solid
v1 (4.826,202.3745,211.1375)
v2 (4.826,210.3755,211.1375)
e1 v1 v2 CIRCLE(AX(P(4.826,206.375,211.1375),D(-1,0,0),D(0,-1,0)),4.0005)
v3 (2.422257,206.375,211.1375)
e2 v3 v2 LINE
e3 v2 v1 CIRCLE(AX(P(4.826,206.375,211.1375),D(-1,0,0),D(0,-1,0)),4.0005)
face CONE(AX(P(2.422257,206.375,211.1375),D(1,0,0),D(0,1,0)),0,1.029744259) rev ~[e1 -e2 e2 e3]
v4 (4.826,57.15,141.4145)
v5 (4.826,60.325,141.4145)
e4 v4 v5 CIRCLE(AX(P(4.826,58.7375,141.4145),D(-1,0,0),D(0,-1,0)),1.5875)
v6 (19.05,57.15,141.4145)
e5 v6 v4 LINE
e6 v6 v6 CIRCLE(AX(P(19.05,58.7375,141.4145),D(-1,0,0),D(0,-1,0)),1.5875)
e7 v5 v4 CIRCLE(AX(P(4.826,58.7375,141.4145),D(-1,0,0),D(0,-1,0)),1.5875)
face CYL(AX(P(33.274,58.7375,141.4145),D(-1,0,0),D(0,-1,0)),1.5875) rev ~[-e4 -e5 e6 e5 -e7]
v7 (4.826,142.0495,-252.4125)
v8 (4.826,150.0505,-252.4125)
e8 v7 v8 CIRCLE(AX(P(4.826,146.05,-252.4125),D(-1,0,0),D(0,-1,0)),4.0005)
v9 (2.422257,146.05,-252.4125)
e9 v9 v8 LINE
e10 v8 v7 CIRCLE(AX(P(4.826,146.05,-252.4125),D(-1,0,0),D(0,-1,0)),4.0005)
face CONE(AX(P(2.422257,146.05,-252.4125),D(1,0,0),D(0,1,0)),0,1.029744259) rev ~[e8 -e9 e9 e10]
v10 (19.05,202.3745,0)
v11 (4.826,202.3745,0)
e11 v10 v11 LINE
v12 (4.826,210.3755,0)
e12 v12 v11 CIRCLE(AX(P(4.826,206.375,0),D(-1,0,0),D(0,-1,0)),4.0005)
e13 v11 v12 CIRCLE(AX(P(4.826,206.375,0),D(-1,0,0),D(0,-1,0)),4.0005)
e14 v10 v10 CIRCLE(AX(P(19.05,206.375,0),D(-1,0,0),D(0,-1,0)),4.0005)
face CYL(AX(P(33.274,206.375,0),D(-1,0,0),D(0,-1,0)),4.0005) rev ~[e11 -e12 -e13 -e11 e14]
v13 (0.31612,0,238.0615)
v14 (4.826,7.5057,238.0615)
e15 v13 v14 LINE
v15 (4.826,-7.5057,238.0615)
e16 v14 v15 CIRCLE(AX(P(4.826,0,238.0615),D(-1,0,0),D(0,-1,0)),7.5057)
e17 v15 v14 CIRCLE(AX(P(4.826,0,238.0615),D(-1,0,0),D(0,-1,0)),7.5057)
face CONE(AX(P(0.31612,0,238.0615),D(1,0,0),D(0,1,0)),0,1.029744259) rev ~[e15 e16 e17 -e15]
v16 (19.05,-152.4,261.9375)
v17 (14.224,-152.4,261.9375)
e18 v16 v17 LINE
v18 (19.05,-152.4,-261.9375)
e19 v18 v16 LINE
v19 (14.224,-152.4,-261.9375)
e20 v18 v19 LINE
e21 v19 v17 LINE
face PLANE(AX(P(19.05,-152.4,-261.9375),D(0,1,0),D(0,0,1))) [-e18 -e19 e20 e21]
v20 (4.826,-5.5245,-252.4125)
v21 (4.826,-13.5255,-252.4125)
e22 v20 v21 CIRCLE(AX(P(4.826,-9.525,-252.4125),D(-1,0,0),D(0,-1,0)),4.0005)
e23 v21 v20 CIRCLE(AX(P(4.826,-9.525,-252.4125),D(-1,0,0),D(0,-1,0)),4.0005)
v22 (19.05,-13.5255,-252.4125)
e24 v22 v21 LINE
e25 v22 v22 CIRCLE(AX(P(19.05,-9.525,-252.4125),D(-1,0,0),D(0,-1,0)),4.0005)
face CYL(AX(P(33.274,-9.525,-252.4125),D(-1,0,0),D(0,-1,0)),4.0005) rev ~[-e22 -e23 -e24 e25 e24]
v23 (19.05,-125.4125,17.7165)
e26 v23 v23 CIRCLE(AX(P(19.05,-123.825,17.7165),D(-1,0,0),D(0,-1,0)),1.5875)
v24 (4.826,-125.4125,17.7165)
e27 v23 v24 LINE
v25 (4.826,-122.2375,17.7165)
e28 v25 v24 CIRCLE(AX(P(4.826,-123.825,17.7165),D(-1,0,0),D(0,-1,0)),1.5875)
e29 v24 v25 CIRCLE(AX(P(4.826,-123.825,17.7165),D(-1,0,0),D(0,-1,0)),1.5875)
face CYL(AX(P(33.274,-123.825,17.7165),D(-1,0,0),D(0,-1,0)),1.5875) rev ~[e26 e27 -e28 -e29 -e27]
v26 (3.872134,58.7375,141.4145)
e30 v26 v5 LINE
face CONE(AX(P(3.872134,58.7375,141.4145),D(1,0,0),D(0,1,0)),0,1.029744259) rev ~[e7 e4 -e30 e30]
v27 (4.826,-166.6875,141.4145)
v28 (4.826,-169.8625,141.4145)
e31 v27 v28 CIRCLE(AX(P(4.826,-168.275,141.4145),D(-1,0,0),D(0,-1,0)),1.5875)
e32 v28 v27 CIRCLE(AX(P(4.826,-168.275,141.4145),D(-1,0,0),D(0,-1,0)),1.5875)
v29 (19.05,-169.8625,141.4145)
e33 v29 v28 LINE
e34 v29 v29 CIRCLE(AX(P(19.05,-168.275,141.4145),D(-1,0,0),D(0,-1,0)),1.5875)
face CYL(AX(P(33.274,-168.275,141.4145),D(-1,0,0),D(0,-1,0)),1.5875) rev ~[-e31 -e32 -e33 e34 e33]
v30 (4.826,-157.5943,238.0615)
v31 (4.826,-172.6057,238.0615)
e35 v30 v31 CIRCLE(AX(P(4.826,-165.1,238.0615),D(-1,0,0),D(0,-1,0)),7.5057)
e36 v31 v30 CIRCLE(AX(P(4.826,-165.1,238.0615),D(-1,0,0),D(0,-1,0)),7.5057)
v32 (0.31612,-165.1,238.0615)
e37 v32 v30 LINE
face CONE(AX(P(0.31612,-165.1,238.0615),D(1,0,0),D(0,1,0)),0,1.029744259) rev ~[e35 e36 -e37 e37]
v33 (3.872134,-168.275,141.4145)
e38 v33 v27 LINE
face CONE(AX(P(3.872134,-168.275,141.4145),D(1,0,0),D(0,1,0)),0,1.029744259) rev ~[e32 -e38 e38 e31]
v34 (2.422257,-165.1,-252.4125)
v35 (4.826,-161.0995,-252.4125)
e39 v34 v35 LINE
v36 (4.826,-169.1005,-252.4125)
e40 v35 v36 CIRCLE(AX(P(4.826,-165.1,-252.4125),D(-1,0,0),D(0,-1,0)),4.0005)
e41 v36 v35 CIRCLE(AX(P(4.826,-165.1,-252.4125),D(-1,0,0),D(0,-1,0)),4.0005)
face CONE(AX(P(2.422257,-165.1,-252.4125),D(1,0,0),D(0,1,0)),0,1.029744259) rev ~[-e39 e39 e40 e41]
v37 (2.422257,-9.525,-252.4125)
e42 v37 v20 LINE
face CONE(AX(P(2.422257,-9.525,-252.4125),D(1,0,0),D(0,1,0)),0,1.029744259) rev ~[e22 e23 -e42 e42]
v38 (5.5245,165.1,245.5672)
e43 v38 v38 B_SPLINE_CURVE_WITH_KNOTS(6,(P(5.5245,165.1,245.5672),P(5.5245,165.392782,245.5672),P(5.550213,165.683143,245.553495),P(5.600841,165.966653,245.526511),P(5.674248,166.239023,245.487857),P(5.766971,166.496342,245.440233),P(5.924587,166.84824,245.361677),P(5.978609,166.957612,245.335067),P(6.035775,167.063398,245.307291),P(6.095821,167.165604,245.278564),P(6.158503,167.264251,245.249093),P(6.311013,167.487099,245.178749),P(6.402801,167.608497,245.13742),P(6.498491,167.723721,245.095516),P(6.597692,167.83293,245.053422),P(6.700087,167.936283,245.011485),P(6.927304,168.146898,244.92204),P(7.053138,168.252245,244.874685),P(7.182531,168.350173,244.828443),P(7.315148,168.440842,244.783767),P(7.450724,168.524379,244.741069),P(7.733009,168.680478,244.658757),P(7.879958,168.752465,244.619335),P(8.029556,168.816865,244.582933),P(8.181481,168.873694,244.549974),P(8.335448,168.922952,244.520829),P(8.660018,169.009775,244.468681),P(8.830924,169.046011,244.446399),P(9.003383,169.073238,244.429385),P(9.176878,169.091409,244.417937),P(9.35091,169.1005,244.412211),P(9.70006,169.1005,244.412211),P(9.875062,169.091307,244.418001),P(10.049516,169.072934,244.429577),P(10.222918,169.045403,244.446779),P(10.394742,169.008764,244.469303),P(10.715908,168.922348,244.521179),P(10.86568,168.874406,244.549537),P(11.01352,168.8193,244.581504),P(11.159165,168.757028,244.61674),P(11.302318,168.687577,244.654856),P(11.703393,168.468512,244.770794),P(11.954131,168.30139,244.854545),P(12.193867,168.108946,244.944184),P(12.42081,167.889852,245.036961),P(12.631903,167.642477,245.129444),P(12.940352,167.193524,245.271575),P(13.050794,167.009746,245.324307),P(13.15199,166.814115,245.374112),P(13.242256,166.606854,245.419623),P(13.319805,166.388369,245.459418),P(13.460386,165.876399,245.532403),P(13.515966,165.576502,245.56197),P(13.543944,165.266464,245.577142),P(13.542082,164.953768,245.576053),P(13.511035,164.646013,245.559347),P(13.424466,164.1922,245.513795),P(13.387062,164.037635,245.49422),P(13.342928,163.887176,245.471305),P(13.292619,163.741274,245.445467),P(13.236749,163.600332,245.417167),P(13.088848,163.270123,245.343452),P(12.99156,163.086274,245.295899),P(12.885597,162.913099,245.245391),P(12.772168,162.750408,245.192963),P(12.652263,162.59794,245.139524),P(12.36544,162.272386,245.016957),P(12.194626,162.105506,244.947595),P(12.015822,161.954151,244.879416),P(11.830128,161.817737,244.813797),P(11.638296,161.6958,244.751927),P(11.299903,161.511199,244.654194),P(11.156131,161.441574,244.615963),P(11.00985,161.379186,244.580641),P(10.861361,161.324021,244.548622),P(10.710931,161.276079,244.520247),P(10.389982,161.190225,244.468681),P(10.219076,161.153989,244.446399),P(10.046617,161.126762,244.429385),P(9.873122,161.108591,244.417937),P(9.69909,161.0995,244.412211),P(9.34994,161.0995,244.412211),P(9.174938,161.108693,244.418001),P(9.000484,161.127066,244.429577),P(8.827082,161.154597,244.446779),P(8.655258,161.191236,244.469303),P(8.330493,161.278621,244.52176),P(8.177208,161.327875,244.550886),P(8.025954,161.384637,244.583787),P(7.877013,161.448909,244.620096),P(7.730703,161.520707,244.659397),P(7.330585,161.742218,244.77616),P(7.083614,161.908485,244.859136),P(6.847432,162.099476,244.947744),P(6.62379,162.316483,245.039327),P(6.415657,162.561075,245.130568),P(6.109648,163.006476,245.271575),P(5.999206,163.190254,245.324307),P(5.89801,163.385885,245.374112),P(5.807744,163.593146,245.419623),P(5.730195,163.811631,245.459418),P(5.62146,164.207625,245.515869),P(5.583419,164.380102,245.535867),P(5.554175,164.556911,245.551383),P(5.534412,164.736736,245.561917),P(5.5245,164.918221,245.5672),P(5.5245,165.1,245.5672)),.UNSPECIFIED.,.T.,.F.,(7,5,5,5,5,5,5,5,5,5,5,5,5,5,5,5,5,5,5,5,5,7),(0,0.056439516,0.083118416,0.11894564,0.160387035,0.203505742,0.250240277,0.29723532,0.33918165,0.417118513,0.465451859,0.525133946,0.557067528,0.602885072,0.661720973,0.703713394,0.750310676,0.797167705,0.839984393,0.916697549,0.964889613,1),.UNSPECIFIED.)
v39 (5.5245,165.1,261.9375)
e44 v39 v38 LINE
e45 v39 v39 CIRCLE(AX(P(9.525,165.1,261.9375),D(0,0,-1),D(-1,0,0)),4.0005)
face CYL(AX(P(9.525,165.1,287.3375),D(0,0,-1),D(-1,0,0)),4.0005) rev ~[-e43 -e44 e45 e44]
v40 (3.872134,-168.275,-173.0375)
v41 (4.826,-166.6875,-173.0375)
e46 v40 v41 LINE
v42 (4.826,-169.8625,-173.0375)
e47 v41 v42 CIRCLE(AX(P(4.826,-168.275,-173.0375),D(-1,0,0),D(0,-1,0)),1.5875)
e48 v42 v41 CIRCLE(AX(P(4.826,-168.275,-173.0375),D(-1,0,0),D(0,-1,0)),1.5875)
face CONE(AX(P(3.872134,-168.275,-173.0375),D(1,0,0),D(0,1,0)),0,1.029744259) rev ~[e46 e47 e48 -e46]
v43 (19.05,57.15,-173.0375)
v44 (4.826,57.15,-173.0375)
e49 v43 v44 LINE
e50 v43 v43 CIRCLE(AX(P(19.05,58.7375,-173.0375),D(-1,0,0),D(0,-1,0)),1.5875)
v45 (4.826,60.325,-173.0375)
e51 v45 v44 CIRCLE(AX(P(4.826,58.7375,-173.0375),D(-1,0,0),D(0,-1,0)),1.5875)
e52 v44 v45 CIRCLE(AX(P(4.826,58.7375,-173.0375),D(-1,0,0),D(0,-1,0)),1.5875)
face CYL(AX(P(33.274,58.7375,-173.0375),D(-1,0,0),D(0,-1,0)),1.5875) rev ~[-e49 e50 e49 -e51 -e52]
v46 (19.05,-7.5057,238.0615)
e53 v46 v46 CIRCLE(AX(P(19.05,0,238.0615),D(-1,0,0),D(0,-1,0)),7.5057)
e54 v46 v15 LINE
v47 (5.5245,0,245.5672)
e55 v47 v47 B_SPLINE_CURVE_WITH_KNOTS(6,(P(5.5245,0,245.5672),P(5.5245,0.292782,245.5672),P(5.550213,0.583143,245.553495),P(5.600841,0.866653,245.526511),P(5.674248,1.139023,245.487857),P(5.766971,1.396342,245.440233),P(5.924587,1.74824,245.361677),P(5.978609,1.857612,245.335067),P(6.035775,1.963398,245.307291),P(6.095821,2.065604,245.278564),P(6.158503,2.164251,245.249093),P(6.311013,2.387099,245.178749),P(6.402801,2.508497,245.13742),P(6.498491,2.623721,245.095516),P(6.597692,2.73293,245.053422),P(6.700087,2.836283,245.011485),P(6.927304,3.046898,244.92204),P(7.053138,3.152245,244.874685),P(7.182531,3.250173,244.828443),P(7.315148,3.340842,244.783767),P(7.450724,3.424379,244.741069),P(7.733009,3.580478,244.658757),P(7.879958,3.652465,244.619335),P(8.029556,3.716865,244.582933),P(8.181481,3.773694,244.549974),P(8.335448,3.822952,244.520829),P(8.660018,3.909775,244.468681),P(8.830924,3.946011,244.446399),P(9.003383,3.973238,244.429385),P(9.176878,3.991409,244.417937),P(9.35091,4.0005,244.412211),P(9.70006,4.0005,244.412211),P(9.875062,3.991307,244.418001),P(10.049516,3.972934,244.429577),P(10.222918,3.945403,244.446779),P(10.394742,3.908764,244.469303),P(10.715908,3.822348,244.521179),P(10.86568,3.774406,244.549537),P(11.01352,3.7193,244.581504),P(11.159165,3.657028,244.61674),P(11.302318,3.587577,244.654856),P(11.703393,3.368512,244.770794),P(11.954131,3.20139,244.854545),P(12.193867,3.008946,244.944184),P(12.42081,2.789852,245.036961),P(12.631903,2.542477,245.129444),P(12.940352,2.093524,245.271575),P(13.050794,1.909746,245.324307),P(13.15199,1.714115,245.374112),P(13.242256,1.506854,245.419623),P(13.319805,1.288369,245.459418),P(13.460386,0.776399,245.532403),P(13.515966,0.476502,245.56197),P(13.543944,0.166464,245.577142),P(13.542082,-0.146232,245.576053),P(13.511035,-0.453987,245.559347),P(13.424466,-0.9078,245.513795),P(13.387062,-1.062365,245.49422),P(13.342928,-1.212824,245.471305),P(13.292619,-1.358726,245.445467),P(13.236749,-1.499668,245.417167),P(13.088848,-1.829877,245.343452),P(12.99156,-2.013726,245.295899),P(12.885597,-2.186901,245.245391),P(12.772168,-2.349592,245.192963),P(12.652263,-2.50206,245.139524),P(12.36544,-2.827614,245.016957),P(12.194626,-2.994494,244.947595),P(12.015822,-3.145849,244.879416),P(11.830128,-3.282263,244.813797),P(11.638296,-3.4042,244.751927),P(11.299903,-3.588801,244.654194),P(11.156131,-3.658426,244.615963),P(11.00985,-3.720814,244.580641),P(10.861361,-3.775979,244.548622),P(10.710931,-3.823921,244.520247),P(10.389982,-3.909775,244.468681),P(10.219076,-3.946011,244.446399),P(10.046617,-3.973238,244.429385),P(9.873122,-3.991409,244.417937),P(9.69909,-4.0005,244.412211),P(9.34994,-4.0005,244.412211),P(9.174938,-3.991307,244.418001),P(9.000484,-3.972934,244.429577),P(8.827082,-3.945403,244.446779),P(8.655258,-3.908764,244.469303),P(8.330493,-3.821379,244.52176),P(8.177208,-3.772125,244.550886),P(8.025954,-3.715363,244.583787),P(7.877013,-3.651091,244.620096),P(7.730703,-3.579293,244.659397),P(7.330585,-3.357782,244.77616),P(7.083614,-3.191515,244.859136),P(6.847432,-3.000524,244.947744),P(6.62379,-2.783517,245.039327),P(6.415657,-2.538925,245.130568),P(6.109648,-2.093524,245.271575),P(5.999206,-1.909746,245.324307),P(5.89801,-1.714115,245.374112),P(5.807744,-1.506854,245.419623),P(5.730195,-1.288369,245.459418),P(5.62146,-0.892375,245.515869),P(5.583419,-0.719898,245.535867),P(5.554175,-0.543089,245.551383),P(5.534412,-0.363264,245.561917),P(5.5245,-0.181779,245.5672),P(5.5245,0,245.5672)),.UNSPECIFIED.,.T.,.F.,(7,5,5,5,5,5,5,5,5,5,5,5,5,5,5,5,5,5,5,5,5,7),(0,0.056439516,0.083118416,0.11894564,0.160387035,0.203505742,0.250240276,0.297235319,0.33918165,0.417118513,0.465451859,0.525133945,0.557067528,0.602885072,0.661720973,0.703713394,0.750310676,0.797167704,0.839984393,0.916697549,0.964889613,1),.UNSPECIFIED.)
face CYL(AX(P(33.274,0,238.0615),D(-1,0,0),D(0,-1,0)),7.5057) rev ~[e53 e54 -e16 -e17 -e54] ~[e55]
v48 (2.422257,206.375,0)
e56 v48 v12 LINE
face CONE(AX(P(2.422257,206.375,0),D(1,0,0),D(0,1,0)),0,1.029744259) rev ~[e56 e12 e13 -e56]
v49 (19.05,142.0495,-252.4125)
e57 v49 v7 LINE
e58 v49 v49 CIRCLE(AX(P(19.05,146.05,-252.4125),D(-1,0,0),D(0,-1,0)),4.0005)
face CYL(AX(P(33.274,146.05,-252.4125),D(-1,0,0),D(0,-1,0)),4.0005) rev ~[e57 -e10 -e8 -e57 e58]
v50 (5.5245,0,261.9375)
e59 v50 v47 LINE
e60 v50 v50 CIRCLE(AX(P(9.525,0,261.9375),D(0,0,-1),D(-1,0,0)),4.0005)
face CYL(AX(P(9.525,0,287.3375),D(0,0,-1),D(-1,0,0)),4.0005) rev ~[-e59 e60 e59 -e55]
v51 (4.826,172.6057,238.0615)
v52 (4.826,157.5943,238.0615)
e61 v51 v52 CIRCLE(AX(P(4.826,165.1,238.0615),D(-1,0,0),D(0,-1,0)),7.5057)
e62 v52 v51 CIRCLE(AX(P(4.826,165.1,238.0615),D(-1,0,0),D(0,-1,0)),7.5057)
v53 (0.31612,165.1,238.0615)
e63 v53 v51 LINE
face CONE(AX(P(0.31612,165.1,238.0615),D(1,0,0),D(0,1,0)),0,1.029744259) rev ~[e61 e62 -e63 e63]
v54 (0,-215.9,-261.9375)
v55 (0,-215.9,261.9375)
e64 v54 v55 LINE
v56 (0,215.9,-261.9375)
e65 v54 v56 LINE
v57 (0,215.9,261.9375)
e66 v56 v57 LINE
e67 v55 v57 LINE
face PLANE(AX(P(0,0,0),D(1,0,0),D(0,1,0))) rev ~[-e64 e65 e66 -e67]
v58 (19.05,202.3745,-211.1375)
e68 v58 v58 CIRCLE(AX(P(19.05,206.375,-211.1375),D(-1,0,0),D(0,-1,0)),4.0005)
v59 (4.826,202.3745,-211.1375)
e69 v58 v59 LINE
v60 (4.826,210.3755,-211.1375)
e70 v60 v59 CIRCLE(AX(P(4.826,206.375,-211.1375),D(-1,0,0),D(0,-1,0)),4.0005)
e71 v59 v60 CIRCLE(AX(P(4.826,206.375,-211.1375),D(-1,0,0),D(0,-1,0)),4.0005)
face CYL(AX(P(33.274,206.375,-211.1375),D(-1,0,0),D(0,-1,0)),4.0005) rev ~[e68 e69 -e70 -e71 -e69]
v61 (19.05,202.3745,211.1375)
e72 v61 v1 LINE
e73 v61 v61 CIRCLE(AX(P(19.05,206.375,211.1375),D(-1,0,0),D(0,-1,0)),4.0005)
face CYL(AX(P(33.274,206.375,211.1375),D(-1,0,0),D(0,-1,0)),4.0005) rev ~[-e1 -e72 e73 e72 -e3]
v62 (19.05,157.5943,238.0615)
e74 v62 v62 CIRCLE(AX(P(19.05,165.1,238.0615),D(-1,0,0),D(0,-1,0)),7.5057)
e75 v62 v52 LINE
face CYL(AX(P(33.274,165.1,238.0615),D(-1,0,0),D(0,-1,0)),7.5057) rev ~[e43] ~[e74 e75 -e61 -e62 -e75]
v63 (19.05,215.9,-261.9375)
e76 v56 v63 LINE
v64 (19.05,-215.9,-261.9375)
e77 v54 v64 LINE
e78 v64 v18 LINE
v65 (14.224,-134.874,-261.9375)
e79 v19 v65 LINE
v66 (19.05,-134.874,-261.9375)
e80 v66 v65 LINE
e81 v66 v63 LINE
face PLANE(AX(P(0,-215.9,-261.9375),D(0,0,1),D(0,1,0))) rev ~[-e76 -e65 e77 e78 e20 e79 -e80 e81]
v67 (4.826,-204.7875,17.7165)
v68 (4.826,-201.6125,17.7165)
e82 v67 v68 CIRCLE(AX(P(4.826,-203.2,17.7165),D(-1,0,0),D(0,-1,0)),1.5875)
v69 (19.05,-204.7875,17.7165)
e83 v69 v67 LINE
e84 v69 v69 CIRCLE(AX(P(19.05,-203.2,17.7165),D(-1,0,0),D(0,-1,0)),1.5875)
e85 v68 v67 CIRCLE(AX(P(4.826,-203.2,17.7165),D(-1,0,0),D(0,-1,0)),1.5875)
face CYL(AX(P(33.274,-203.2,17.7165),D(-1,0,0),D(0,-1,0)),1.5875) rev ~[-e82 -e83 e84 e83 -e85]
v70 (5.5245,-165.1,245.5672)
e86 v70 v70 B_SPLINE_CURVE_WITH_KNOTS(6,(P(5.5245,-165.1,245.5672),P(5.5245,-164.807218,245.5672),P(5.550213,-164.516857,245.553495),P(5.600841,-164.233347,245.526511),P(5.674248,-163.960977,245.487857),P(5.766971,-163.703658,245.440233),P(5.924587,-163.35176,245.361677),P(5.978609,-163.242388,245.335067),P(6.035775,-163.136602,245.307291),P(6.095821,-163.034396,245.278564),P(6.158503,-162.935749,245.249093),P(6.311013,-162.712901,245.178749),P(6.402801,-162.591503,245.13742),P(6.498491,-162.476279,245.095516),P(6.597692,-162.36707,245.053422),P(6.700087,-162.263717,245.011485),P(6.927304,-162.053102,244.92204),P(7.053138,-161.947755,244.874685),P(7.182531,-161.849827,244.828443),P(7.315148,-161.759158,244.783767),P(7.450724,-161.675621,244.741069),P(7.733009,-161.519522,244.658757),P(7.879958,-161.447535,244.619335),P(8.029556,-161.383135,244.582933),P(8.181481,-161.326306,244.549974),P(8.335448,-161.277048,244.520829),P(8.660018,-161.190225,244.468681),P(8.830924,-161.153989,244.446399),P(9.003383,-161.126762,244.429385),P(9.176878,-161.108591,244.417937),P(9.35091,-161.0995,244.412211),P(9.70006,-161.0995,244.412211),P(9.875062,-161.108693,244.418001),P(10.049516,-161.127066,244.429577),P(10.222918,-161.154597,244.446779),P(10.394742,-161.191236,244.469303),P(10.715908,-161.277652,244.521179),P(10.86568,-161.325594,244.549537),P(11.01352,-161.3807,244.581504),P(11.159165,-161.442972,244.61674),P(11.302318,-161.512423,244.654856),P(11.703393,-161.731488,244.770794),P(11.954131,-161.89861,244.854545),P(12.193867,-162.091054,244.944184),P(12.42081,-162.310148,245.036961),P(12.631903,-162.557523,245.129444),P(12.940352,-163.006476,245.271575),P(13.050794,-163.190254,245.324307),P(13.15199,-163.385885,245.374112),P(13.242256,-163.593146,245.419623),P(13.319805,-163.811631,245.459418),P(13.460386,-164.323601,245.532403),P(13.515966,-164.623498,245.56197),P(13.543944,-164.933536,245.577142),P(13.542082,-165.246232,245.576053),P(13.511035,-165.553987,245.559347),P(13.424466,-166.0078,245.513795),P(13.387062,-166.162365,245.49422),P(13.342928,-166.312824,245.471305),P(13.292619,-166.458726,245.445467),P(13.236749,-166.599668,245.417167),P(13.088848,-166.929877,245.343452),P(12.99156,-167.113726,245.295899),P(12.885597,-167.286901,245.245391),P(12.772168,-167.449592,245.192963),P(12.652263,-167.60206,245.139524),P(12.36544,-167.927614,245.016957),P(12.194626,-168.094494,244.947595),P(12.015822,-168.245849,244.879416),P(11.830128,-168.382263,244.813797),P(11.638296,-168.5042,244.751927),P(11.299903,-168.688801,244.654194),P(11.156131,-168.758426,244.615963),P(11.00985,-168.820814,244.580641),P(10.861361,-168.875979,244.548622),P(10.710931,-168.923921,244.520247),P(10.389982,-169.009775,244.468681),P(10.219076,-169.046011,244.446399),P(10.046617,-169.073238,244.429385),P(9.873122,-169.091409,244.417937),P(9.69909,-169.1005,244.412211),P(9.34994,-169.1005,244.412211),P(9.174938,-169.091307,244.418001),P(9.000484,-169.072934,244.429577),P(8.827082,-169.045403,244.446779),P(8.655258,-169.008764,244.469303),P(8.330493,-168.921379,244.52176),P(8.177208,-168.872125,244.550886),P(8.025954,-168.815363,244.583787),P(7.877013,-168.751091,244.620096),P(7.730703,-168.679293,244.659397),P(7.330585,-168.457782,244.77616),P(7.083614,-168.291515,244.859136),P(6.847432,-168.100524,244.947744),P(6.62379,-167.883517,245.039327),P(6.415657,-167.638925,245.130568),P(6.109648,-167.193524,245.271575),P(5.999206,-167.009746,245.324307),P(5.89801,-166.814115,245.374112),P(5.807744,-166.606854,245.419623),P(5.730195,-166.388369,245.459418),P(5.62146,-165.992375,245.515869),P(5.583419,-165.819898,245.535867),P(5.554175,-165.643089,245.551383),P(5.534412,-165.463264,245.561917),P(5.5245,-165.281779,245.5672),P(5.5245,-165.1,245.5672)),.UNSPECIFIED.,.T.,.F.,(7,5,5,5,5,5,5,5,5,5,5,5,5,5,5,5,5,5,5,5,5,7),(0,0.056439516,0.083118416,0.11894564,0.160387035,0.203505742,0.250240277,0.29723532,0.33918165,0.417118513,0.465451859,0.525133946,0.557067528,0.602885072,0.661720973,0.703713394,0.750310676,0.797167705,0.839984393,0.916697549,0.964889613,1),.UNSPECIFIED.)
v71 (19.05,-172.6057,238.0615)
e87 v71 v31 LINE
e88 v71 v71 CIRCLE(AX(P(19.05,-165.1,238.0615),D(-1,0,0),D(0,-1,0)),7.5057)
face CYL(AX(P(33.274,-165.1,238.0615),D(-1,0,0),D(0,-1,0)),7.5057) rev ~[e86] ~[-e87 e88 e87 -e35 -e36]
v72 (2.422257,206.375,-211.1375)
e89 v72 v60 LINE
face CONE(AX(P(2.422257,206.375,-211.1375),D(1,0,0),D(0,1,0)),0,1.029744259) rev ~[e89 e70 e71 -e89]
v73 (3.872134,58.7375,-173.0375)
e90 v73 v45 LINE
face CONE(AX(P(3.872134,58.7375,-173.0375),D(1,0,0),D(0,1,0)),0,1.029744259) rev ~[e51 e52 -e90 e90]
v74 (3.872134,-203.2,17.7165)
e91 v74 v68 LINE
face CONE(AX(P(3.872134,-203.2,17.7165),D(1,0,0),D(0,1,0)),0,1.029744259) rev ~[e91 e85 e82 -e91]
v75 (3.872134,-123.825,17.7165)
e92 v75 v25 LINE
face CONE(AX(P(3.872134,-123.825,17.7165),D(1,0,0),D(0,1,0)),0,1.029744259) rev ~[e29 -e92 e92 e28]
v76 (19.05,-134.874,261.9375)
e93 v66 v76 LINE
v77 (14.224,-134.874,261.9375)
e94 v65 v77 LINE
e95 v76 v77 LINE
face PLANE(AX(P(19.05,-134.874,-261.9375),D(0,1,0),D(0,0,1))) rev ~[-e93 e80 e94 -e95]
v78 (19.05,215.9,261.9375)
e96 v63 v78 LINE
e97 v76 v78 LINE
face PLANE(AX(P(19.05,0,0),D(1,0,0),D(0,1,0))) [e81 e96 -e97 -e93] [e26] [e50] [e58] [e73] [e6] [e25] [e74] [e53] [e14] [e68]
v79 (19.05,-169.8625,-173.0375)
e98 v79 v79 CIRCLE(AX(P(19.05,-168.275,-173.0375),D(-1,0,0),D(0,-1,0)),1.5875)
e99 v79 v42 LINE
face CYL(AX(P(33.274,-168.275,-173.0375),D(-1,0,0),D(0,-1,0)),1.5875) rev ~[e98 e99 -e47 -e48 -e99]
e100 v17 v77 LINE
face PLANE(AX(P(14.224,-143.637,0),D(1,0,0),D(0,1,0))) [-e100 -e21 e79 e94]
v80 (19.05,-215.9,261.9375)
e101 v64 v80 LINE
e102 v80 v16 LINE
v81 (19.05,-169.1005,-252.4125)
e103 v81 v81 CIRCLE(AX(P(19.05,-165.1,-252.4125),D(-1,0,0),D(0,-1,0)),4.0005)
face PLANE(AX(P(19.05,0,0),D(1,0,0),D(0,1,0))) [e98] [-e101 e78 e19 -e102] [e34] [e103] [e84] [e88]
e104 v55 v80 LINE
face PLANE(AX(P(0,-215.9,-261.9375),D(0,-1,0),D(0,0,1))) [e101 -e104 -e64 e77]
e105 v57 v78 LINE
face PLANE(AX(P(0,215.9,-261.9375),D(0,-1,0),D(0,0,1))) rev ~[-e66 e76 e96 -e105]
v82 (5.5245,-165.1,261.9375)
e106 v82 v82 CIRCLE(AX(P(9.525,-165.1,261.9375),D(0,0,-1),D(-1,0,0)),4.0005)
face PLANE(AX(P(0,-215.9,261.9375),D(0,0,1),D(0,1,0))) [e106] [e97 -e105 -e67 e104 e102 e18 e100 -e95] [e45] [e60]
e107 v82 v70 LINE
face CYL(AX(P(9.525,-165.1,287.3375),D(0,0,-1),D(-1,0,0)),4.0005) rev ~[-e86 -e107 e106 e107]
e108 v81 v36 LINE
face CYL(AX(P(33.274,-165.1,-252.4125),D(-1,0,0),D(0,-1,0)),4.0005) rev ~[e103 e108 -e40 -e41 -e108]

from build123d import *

# Parameters (mm, degrees)
F0_W      = 431.8
F0_H      = 523.875
F1_DEPTH  = 19.05
F3_D      = 8.001
F3_DEPTH  = 14.224
F3_TIP    = 2.4037429064
F4_D      = 15.0114
F4_DEPTH  = 14.224
F4_TIP    = 4.5098795482
F6_D      = 8.001
F6_DEPTH  = 25.4
F6_TIP    = 2.4037429064
F8_D      = 3.175
F8_DEPTH  = 14.224
F8_TIP    = 0.9538662327
F9_W      = 17.526
F9_H      = 523.875
F10_DEPTH = 4.826


with BuildPart() as f1:
    # F0 (on Right) → F1 (new body)
    with BuildSketch(Plane.YZ):
        Rectangle(F0_W, F0_H)
    extrude(amount=F1_DEPTH)

    # F3
    with Locations(Plane.YZ.offset(19.05)):
        with Locations((206.375, 211.1375), (206.375, -211.1375), (146.05, -252.4125), (-9.525, -252.4125), (-165.1, -252.4125), (206.375, 0)):
            Hole(F3_D / 2, depth=F3_DEPTH)
            with Locations((0, 0, -(F3_DEPTH + F3_TIP / 2))):  # 118° drill point
                Cone(0, F3_D / 2, F3_TIP, mode=Mode.SUBTRACT)

    # F4
    with Locations(Plane.YZ.offset(19.05)):
        with Locations((-165.1, 238.0615), (0, 238.0615), (165.1, 238.0615)):
            Hole(F4_D / 2, depth=F4_DEPTH)
            with Locations((0, 0, -(F4_DEPTH + F4_TIP / 2))):  # 118° drill point
                Cone(0, F4_D / 2, F4_TIP, mode=Mode.SUBTRACT)

    # F6
    with Locations(Plane.XY.offset(261.9375)):
        with Locations((9.525, 165.1), (9.525, 0), (9.525, -165.1)):
            Hole(F6_D / 2, depth=F6_DEPTH)
            with Locations((0, 0, -(F6_DEPTH + F6_TIP / 2))):  # 118° drill point
                Cone(0, F6_D / 2, F6_TIP, mode=Mode.SUBTRACT)

    # F8
    with Locations(Plane.YZ.offset(19.05)):
        with Locations((-168.275, 141.4145), (58.7375, 141.4145), (-203.2, 17.7165), (-123.825, 17.7165), (-168.275, -173.0375), (58.7375, -173.0375)):
            Hole(F8_D / 2, depth=F8_DEPTH)
            with Locations((0, 0, -(F8_DEPTH + F8_TIP / 2))):  # 118° drill point
                Cone(0, F8_D / 2, F8_TIP, mode=Mode.SUBTRACT)

    # F9 (on face) → F10 (cut)
    with BuildSketch(Plane.YZ.offset(19.05)):
        with Locations((-143.637, 0)):
            Rectangle(F9_W, F9_H)
    extrude(amount=-F10_DEPTH, mode=Mode.SUBTRACT)


solid = f1.part
